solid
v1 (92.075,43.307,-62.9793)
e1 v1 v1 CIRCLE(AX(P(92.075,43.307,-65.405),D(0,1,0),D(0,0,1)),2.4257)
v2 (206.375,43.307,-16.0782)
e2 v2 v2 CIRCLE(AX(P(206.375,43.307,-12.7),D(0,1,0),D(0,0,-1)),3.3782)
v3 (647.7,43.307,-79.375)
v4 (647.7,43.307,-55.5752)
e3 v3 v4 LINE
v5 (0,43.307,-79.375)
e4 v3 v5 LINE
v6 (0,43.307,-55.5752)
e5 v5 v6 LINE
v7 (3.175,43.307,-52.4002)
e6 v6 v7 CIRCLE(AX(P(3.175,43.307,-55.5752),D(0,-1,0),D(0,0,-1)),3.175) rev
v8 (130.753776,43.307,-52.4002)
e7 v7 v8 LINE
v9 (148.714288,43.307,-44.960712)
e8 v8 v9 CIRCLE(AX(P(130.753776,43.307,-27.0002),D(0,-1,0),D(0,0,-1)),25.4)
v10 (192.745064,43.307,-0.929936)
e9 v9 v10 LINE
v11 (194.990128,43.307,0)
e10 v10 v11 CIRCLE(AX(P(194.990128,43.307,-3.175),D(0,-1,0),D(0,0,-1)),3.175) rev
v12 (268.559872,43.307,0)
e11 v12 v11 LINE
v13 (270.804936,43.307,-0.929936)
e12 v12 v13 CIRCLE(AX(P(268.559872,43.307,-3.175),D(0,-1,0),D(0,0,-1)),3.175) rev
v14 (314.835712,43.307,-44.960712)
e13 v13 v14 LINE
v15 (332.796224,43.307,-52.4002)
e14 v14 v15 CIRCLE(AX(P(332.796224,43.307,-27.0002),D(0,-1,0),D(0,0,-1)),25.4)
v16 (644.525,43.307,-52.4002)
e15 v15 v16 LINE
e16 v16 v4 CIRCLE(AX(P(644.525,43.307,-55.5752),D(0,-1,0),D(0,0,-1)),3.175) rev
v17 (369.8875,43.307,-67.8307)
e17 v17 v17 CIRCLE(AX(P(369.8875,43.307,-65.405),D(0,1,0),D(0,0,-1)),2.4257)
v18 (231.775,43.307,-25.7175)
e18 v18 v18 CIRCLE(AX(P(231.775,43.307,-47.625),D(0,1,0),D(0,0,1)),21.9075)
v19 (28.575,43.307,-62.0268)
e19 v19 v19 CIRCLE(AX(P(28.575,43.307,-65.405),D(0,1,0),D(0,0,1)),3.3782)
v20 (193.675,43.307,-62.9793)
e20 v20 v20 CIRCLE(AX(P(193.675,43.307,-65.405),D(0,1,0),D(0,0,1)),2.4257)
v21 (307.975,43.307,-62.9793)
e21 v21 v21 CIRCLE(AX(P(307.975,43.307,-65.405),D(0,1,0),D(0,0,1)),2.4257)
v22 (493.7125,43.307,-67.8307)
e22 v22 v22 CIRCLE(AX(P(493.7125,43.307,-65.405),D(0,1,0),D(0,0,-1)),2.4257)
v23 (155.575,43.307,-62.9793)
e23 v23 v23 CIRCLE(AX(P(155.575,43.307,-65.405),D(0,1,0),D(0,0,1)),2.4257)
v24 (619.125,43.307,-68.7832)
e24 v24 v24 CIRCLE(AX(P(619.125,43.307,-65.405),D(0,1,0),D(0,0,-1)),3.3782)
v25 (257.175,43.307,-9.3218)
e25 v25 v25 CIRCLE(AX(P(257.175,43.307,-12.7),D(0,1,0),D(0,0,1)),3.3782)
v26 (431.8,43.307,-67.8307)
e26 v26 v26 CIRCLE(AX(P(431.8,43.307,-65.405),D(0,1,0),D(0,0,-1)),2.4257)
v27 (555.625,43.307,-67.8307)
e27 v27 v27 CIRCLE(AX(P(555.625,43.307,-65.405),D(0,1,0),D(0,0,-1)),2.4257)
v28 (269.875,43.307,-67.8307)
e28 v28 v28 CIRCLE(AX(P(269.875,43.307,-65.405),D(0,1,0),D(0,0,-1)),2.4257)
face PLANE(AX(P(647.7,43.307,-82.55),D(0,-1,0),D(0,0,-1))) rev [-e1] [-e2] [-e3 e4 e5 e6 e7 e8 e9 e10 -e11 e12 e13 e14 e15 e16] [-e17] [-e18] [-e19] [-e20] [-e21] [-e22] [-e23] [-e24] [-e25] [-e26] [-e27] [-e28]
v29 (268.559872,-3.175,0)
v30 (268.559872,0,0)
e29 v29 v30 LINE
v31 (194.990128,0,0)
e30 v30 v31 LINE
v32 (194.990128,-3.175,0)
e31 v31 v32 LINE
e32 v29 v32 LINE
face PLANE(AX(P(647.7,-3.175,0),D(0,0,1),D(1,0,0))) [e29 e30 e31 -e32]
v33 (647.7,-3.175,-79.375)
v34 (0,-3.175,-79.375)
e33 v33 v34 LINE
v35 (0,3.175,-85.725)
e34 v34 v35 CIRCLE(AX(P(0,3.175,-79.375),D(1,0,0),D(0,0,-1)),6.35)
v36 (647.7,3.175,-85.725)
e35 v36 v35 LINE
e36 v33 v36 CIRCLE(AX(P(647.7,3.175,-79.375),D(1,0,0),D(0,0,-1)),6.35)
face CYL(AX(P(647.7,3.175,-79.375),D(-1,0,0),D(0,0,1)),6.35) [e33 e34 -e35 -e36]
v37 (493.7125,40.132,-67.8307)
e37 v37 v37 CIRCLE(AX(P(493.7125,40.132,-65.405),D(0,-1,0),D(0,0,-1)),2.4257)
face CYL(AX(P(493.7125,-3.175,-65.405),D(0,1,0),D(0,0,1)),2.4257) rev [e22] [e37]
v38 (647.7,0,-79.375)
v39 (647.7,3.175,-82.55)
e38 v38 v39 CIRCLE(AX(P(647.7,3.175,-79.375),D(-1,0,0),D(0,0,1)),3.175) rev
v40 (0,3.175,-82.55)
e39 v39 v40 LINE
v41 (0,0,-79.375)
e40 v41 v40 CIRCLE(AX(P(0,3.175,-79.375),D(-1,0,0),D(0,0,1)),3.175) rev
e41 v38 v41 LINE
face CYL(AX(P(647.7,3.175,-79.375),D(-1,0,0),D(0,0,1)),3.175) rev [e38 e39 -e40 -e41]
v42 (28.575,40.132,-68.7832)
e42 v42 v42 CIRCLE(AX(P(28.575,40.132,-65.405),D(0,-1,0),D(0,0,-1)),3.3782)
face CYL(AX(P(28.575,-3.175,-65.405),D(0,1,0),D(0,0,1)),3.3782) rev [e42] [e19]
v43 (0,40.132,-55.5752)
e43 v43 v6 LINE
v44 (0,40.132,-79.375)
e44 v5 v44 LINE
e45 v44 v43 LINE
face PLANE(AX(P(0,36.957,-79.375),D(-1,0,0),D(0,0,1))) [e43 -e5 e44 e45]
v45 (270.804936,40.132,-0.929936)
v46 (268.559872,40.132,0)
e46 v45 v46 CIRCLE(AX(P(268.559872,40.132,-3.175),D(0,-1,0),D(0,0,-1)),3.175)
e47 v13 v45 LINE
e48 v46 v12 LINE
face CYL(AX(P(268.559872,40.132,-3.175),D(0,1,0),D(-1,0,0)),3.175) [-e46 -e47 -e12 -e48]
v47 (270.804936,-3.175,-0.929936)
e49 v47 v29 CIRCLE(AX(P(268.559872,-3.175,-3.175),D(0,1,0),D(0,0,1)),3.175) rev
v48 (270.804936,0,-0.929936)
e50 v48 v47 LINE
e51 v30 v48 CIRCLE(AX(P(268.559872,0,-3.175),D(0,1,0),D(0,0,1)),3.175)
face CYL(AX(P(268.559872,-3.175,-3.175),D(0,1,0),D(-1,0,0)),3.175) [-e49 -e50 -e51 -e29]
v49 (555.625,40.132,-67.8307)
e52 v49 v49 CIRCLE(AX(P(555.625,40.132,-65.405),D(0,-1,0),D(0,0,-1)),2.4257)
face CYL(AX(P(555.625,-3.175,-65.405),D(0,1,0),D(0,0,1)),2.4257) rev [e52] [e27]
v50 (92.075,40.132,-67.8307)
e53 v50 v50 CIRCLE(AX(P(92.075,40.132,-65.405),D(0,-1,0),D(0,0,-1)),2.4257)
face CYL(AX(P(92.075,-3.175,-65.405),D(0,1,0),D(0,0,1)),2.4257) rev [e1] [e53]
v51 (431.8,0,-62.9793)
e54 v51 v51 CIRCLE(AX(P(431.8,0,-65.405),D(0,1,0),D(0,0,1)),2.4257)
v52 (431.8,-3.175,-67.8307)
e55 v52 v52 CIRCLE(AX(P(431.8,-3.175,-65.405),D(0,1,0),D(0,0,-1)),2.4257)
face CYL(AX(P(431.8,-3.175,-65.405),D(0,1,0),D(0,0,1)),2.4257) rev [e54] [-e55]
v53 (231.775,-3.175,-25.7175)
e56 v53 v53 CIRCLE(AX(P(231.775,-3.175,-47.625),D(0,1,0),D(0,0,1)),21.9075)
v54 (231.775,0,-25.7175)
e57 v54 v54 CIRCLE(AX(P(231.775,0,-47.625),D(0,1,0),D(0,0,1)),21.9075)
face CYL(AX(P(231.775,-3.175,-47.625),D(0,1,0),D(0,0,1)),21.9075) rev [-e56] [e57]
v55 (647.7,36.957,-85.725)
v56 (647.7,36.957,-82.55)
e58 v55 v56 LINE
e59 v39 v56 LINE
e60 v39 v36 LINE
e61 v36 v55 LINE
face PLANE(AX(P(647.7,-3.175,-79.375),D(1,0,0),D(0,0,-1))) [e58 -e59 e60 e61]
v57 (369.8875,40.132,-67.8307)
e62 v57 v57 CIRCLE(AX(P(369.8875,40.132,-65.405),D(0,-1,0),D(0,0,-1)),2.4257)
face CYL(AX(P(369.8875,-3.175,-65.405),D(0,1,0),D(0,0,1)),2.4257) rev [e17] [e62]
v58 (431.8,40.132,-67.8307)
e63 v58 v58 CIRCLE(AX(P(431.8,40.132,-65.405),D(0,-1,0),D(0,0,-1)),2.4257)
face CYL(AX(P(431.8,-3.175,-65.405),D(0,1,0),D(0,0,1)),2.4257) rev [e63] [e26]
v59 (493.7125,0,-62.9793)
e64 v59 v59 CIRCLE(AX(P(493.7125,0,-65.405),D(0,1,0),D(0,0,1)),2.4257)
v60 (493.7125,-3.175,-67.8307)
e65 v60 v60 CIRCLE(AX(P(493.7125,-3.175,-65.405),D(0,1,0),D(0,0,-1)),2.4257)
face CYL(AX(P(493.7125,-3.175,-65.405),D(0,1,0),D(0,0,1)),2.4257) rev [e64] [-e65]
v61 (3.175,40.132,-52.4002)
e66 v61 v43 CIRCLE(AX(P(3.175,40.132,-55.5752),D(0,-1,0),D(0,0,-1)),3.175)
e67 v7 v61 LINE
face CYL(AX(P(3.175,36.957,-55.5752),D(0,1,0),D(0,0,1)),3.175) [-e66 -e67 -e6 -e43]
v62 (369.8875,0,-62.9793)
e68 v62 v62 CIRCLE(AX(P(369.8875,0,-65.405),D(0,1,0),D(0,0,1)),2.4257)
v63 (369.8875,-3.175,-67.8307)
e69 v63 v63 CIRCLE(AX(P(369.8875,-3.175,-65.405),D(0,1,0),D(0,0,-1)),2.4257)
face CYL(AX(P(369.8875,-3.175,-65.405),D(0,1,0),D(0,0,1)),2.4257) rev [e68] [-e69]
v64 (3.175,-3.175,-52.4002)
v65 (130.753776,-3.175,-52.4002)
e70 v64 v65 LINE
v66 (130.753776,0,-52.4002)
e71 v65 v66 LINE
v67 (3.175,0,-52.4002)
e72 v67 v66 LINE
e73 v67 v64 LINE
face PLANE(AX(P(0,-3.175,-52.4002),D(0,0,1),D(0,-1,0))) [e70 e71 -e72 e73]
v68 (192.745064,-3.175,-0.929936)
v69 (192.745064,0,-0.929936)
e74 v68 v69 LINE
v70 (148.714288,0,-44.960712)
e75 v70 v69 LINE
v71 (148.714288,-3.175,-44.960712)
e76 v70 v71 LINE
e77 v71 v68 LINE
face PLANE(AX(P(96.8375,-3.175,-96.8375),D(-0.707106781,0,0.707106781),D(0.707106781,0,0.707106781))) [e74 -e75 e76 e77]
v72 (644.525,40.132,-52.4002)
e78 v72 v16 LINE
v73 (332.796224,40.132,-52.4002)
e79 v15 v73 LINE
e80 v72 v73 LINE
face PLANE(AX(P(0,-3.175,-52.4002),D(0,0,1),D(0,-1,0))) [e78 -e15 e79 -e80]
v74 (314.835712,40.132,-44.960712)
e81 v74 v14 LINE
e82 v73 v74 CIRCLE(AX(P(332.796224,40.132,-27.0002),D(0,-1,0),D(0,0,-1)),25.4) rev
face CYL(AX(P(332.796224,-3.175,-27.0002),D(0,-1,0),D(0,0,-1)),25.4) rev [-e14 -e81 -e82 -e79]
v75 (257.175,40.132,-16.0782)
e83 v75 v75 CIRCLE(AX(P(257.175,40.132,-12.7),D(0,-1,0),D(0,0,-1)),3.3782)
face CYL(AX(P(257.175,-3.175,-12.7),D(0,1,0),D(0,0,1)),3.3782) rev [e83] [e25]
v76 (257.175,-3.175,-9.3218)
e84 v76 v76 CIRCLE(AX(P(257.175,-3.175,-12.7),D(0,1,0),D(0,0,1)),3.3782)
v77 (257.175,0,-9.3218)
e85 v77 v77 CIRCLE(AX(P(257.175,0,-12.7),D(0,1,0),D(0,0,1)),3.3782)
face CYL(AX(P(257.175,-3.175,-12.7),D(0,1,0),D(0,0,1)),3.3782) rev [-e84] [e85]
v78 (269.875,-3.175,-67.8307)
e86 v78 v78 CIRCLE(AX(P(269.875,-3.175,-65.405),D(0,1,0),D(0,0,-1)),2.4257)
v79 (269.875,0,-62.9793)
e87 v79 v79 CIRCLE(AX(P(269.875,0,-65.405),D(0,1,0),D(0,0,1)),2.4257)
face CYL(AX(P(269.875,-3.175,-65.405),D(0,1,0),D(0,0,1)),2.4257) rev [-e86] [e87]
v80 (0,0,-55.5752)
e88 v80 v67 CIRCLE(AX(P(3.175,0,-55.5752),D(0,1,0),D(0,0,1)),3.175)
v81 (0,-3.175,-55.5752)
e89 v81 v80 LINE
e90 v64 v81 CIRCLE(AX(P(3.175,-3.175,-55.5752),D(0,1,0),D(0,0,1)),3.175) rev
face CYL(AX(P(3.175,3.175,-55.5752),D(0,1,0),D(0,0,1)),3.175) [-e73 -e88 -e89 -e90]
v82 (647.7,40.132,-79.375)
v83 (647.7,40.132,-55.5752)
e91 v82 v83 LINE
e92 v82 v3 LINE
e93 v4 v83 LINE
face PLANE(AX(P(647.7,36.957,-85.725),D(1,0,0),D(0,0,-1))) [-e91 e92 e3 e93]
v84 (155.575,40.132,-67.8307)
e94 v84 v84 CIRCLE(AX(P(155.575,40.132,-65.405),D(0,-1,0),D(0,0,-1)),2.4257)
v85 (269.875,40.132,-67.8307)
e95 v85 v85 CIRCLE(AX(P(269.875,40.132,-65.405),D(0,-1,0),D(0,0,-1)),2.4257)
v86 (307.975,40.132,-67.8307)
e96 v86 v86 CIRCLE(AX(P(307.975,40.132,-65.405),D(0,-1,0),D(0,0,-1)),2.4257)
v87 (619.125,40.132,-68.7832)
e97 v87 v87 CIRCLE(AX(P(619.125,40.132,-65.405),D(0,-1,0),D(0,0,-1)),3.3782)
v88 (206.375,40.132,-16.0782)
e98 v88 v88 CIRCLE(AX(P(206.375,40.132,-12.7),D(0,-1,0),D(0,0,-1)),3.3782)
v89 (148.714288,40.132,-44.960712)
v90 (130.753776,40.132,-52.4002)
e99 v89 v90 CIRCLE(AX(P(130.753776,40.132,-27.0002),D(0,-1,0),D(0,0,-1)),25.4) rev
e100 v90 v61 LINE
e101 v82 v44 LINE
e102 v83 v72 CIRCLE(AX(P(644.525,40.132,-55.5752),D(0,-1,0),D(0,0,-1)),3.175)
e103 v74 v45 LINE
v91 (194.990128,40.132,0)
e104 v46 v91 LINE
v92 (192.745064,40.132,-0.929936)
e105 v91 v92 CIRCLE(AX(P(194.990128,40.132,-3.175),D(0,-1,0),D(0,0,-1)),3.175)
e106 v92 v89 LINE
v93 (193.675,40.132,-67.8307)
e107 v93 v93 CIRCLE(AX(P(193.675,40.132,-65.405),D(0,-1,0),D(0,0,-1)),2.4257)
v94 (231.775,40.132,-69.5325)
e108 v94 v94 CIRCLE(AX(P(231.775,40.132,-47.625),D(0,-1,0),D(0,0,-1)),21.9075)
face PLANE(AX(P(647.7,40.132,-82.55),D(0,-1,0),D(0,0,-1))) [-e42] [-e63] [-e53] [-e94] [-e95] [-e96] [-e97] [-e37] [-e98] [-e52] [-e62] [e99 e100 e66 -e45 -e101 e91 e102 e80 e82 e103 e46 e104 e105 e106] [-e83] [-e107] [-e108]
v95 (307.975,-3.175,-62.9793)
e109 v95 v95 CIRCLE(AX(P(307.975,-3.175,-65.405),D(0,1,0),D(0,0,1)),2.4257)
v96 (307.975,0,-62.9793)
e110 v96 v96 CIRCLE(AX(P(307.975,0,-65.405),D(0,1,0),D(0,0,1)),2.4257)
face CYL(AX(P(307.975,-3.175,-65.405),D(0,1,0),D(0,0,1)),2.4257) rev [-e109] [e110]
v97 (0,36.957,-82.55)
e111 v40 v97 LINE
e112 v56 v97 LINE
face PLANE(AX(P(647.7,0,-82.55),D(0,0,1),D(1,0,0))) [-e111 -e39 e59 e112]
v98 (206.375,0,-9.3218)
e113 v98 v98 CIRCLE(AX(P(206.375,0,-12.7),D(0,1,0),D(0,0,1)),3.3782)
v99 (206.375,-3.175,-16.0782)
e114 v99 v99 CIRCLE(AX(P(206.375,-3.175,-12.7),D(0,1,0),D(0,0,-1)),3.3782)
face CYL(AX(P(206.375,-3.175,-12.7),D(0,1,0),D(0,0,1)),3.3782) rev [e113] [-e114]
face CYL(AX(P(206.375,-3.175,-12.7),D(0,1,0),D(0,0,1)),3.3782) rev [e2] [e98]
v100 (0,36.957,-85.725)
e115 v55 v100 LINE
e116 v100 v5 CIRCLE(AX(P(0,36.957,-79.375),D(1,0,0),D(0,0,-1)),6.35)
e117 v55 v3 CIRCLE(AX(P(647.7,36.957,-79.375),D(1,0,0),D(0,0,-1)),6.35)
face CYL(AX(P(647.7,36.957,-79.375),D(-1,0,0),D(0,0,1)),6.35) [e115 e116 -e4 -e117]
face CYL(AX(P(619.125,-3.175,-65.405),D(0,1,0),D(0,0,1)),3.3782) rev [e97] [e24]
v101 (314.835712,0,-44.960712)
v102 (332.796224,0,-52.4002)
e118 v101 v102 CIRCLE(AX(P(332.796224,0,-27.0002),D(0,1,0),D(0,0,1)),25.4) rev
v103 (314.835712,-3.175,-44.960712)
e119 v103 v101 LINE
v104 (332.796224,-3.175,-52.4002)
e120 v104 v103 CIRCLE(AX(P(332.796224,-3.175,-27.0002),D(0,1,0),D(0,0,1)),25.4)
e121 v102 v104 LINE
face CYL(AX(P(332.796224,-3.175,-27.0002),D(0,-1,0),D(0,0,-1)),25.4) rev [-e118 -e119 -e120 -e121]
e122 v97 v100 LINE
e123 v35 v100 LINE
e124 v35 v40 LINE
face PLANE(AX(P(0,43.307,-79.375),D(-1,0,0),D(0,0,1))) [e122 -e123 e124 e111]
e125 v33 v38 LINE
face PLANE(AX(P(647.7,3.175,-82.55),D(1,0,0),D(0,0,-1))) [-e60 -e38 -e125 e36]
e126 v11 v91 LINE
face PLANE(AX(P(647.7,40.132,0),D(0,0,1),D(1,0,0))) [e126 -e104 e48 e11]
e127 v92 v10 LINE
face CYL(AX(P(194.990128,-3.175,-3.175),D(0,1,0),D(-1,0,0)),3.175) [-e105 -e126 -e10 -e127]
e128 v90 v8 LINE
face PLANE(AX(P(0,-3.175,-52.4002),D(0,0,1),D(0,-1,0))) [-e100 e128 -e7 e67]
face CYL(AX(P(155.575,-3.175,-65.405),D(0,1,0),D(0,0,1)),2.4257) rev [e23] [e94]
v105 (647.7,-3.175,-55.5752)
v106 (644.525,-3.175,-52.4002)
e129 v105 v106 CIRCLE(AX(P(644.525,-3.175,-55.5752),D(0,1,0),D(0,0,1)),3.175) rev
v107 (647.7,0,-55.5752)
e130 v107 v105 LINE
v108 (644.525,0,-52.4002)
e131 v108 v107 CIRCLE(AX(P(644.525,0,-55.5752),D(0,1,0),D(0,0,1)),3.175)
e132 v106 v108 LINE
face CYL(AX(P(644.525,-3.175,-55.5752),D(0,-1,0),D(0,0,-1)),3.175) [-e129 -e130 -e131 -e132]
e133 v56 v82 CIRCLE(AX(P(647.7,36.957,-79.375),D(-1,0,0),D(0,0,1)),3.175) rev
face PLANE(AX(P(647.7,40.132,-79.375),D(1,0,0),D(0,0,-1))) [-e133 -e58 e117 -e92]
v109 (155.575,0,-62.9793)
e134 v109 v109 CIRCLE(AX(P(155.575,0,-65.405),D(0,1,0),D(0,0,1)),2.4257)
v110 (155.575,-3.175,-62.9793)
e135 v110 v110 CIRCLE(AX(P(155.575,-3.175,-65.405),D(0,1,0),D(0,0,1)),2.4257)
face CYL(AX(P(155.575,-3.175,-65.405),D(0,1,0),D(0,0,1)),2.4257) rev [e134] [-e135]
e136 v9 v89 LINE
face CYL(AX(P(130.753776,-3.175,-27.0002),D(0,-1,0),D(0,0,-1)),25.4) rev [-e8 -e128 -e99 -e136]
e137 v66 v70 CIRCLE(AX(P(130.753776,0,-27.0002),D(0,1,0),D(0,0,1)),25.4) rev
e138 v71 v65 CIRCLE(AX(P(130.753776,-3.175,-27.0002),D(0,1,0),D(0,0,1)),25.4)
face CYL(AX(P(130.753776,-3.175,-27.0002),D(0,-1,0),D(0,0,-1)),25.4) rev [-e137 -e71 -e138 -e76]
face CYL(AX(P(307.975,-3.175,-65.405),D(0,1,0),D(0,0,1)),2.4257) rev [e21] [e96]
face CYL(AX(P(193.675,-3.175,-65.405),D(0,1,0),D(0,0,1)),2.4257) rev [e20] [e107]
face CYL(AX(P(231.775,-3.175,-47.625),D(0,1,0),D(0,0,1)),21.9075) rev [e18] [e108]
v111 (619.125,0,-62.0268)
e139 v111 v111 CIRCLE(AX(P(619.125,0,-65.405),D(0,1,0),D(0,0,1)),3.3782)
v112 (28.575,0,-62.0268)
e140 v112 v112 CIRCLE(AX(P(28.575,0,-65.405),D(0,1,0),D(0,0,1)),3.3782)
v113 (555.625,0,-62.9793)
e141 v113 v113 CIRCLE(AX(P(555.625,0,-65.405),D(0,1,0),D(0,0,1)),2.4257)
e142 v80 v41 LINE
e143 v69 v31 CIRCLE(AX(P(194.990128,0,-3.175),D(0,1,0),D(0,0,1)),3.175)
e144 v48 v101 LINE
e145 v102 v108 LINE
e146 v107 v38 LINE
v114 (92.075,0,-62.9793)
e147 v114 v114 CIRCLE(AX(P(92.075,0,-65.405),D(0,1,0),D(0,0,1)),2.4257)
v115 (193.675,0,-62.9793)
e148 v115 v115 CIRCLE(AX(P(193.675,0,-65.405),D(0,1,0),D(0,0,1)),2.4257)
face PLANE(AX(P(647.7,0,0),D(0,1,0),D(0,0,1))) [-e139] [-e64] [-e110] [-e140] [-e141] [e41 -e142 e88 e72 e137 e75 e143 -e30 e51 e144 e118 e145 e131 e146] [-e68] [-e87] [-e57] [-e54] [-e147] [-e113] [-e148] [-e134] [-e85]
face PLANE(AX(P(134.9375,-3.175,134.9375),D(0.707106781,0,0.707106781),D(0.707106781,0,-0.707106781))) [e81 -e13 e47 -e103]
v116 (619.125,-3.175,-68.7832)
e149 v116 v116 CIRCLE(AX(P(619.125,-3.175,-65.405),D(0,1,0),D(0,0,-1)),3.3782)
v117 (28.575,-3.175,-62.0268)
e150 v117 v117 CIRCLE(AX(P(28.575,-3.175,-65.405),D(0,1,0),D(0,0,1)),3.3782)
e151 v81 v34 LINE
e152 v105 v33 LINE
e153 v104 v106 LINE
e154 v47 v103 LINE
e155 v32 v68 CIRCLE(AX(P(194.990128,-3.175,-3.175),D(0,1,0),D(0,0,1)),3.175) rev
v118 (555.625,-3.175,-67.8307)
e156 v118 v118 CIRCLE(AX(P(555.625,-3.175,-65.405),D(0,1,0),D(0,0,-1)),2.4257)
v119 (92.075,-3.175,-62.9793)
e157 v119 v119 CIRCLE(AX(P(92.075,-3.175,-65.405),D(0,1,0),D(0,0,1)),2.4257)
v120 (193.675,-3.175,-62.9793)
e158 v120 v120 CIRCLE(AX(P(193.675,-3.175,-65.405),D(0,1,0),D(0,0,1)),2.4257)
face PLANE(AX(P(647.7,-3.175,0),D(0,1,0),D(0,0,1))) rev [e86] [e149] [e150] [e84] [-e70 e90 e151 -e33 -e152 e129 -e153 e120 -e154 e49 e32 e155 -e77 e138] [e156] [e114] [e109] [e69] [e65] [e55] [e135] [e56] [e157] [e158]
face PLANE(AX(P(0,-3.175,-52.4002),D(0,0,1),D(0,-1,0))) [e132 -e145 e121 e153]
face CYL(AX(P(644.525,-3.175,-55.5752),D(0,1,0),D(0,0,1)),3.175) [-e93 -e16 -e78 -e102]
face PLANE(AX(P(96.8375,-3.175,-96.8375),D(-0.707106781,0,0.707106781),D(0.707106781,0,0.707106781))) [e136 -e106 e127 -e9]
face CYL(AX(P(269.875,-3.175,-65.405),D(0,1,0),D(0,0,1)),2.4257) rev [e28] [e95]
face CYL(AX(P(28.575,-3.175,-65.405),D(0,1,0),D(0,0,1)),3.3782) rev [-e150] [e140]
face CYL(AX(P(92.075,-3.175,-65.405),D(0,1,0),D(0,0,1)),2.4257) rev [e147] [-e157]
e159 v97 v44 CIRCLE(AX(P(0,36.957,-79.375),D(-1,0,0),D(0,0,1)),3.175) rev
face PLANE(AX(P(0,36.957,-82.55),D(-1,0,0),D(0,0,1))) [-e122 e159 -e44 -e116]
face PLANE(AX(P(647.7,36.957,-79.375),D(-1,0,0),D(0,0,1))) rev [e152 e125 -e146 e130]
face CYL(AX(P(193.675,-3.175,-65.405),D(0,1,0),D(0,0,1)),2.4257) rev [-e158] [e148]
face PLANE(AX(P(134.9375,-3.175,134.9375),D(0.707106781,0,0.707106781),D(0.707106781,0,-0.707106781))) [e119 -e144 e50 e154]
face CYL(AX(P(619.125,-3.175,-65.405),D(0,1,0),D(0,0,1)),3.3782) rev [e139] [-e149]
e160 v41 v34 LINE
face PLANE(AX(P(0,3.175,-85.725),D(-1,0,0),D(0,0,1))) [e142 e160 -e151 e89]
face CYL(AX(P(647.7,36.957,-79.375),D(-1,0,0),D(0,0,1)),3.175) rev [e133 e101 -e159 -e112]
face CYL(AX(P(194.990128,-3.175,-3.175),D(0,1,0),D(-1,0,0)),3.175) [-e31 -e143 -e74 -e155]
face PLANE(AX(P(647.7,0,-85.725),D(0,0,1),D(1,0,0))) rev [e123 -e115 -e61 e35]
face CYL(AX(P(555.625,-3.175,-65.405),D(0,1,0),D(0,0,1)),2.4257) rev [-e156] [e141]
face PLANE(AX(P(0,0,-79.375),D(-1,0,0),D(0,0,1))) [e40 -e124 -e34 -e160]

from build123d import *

# Parameters (mm, degrees)
BASE_FLANGE1_DEPTH = 647.7
SKETCH6_R          = 21.9075
CUT_EXTRUDE1_DEPTH = 655.999726679
CUT_EXTRUDE2_DEPTH = 655.999726679
SKETCH8_R          = 3.3782
SKETCH8_R_2        = 2.4257
CUT_EXTRUDE3_DEPTH = 655.999726679
SKETCH9_R          = 3.3782
CUT_EXTRUDE4_DEPTH = 655.999726679
FILLET1_R          = 25.4
FILLET2_R          = 3.175


# Sheet-metal steps are written as plain solids
with BuildPart() as part:
    # Sketch1 → Base-Flange1 (new body)
    with BuildSketch(Plane(origin=(0, 0, 0), x_dir=(0, 0, -1), z_dir=(1, 0, 0))):
        with BuildLine():
            Line((0, 0), (79.375, 0))
            ThreePointArc((79.375, 0), (81.62006403, 0.92993597), (82.55, 3.175))
            Line((82.55, 3.175), (82.55, 36.957))
            ThreePointArc((82.55, 36.957), (81.62006403, 39.20206403), (79.375, 40.132))
            Line((79.375, 40.132), (0, 40.132))
            Line((0, 40.132), (0, 43.307))
            Line((0, 43.307), (79.375, 43.307))
            ThreePointArc((79.375, 43.307), (83.865128061, 41.447128061), (85.725, 36.957))
            Line((85.725, 36.957), (85.725, 3.175))
            ThreePointArc((85.725, 3.175), (83.865128061, -1.315128061), (79.375, -3.175))
            Line((79.375, -3.175), (0, -3.175))
            Line((0, -3.175), (0, 0))
        make_face()
    extrude(amount=BASE_FLANGE1_DEPTH)

    # Sketch6 → Cut-Extrude1 (cut, through all)
    with BuildSketch(Plane(origin=(0, 43.307, 0), x_dir=(1, 0, 0), z_dir=(0, 1, 0))):
        with Locations(Location((231.775, 47.625, 0), (0, 0, 270))):
            Circle(SKETCH6_R)
    extrude(amount=-CUT_EXTRUDE1_DEPTH, mode=Mode.SUBTRACT)

    # Sketch7 → Cut-Extrude2 (cut, through all)
    with BuildSketch(Plane(origin=(0, 43.307, 0), x_dir=(1, 0, 0), z_dir=(0, 1, 0))):
        Polygon((141.2748, 52.4002), (0, 52.4002), (0, 0), (193.675, 0), align=None)
        Polygon((322.2752, 52.4002), (269.875, 0), (647.7, 0), (647.7, 52.4002), align=None)
    extrude(amount=-CUT_EXTRUDE2_DEPTH, mode=Mode.SUBTRACT)

    # Sketch8 → Cut-Extrude3 (cut, through all)
    with BuildSketch(Plane(origin=(0, 43.307, 0), x_dir=(1, 0, 0), z_dir=(0, 1, 0))):
        with Locations(Location((28.575, 65.405, 0), (0, 0, 270))):
            Circle(SKETCH8_R)
        with Locations(Location((92.075, 65.405, 0), (0, 0, 270))):
            Circle(SKETCH8_R_2)
        with Locations(Location((193.675, 65.405, 0), (0, 0, 270))):
            Circle(SKETCH8_R_2)
        with Locations(Location((269.875, 65.405, 0), (0, 0, 270))):
            Circle(SKETCH8_R_2)
        with Locations(Location((555.625, 65.405, 0), (0, 0, 270))):
            Circle(SKETCH8_R_2)
        with Locations(Location((619.125, 65.405, 0), (0, 0, 270))):
            Circle(SKETCH8_R)
        with Locations(Location((155.575, 65.405, 0), (0, 0, 270))):
            Circle(SKETCH8_R_2)
        with Locations(Location((307.975, 65.405, 0), (0, 0, 270))):
            Circle(SKETCH8_R_2)
        with Locations(Location((493.7125, 65.405, 0), (0, 0, 270))):
            Circle(SKETCH8_R_2)
        with Locations(Location((431.8, 65.405, 0), (0, 0, 270))):
            Circle(SKETCH8_R_2)
        with Locations(Location((369.8875, 65.405, 0), (0, 0, 270))):
            Circle(SKETCH8_R_2)
    extrude(amount=-CUT_EXTRUDE3_DEPTH, mode=Mode.SUBTRACT)

    # Sketch9 → Cut-Extrude4 (cut, through all)
    with BuildSketch(Plane(origin=(0, 43.307, 0), x_dir=(1, 0, 0), z_dir=(0, 1, 0))):
        with Locations(Location((257.175, 12.7, 0), (0, 0, 270))):
            Circle(SKETCH9_R)
        with Locations(Location((206.375, 12.7, 0), (0, 0, 270))):
            Circle(SKETCH9_R)
    extrude(amount=-CUT_EXTRUDE4_DEPTH, mode=Mode.SUBTRACT)

    # Fillet1
    fillet1_edges = [part.edges().sort_by_distance(p)[0] for p in [
        (141.2748, 41.7195, -52.4002),
        (141.2748, -1.5875, -52.4002),
        (322.2752, 41.7195, -52.4002),
        (322.2752, -1.5875, -52.4002),
    ]]
    fillet(fillet1_edges, radius=FILLET1_R)

    # Fillet2
    fillet2_edges = [part.edges().sort_by_distance(p)[0] for p in [
        (0, 41.7195, -52.4002),
        (193.675, 41.7195, 0),
        (193.675, -1.5875, 0),
        (0, -1.5875, -52.4002),
        (647.7, 41.7195, -52.4002),
        (269.875, 41.7195, 0),
        (647.7, -1.5875, -52.4002),
        (269.875, -1.5875, 0),
    ]]
    fillet(fillet2_edges, radius=FILLET2_R)


solid = part.part
